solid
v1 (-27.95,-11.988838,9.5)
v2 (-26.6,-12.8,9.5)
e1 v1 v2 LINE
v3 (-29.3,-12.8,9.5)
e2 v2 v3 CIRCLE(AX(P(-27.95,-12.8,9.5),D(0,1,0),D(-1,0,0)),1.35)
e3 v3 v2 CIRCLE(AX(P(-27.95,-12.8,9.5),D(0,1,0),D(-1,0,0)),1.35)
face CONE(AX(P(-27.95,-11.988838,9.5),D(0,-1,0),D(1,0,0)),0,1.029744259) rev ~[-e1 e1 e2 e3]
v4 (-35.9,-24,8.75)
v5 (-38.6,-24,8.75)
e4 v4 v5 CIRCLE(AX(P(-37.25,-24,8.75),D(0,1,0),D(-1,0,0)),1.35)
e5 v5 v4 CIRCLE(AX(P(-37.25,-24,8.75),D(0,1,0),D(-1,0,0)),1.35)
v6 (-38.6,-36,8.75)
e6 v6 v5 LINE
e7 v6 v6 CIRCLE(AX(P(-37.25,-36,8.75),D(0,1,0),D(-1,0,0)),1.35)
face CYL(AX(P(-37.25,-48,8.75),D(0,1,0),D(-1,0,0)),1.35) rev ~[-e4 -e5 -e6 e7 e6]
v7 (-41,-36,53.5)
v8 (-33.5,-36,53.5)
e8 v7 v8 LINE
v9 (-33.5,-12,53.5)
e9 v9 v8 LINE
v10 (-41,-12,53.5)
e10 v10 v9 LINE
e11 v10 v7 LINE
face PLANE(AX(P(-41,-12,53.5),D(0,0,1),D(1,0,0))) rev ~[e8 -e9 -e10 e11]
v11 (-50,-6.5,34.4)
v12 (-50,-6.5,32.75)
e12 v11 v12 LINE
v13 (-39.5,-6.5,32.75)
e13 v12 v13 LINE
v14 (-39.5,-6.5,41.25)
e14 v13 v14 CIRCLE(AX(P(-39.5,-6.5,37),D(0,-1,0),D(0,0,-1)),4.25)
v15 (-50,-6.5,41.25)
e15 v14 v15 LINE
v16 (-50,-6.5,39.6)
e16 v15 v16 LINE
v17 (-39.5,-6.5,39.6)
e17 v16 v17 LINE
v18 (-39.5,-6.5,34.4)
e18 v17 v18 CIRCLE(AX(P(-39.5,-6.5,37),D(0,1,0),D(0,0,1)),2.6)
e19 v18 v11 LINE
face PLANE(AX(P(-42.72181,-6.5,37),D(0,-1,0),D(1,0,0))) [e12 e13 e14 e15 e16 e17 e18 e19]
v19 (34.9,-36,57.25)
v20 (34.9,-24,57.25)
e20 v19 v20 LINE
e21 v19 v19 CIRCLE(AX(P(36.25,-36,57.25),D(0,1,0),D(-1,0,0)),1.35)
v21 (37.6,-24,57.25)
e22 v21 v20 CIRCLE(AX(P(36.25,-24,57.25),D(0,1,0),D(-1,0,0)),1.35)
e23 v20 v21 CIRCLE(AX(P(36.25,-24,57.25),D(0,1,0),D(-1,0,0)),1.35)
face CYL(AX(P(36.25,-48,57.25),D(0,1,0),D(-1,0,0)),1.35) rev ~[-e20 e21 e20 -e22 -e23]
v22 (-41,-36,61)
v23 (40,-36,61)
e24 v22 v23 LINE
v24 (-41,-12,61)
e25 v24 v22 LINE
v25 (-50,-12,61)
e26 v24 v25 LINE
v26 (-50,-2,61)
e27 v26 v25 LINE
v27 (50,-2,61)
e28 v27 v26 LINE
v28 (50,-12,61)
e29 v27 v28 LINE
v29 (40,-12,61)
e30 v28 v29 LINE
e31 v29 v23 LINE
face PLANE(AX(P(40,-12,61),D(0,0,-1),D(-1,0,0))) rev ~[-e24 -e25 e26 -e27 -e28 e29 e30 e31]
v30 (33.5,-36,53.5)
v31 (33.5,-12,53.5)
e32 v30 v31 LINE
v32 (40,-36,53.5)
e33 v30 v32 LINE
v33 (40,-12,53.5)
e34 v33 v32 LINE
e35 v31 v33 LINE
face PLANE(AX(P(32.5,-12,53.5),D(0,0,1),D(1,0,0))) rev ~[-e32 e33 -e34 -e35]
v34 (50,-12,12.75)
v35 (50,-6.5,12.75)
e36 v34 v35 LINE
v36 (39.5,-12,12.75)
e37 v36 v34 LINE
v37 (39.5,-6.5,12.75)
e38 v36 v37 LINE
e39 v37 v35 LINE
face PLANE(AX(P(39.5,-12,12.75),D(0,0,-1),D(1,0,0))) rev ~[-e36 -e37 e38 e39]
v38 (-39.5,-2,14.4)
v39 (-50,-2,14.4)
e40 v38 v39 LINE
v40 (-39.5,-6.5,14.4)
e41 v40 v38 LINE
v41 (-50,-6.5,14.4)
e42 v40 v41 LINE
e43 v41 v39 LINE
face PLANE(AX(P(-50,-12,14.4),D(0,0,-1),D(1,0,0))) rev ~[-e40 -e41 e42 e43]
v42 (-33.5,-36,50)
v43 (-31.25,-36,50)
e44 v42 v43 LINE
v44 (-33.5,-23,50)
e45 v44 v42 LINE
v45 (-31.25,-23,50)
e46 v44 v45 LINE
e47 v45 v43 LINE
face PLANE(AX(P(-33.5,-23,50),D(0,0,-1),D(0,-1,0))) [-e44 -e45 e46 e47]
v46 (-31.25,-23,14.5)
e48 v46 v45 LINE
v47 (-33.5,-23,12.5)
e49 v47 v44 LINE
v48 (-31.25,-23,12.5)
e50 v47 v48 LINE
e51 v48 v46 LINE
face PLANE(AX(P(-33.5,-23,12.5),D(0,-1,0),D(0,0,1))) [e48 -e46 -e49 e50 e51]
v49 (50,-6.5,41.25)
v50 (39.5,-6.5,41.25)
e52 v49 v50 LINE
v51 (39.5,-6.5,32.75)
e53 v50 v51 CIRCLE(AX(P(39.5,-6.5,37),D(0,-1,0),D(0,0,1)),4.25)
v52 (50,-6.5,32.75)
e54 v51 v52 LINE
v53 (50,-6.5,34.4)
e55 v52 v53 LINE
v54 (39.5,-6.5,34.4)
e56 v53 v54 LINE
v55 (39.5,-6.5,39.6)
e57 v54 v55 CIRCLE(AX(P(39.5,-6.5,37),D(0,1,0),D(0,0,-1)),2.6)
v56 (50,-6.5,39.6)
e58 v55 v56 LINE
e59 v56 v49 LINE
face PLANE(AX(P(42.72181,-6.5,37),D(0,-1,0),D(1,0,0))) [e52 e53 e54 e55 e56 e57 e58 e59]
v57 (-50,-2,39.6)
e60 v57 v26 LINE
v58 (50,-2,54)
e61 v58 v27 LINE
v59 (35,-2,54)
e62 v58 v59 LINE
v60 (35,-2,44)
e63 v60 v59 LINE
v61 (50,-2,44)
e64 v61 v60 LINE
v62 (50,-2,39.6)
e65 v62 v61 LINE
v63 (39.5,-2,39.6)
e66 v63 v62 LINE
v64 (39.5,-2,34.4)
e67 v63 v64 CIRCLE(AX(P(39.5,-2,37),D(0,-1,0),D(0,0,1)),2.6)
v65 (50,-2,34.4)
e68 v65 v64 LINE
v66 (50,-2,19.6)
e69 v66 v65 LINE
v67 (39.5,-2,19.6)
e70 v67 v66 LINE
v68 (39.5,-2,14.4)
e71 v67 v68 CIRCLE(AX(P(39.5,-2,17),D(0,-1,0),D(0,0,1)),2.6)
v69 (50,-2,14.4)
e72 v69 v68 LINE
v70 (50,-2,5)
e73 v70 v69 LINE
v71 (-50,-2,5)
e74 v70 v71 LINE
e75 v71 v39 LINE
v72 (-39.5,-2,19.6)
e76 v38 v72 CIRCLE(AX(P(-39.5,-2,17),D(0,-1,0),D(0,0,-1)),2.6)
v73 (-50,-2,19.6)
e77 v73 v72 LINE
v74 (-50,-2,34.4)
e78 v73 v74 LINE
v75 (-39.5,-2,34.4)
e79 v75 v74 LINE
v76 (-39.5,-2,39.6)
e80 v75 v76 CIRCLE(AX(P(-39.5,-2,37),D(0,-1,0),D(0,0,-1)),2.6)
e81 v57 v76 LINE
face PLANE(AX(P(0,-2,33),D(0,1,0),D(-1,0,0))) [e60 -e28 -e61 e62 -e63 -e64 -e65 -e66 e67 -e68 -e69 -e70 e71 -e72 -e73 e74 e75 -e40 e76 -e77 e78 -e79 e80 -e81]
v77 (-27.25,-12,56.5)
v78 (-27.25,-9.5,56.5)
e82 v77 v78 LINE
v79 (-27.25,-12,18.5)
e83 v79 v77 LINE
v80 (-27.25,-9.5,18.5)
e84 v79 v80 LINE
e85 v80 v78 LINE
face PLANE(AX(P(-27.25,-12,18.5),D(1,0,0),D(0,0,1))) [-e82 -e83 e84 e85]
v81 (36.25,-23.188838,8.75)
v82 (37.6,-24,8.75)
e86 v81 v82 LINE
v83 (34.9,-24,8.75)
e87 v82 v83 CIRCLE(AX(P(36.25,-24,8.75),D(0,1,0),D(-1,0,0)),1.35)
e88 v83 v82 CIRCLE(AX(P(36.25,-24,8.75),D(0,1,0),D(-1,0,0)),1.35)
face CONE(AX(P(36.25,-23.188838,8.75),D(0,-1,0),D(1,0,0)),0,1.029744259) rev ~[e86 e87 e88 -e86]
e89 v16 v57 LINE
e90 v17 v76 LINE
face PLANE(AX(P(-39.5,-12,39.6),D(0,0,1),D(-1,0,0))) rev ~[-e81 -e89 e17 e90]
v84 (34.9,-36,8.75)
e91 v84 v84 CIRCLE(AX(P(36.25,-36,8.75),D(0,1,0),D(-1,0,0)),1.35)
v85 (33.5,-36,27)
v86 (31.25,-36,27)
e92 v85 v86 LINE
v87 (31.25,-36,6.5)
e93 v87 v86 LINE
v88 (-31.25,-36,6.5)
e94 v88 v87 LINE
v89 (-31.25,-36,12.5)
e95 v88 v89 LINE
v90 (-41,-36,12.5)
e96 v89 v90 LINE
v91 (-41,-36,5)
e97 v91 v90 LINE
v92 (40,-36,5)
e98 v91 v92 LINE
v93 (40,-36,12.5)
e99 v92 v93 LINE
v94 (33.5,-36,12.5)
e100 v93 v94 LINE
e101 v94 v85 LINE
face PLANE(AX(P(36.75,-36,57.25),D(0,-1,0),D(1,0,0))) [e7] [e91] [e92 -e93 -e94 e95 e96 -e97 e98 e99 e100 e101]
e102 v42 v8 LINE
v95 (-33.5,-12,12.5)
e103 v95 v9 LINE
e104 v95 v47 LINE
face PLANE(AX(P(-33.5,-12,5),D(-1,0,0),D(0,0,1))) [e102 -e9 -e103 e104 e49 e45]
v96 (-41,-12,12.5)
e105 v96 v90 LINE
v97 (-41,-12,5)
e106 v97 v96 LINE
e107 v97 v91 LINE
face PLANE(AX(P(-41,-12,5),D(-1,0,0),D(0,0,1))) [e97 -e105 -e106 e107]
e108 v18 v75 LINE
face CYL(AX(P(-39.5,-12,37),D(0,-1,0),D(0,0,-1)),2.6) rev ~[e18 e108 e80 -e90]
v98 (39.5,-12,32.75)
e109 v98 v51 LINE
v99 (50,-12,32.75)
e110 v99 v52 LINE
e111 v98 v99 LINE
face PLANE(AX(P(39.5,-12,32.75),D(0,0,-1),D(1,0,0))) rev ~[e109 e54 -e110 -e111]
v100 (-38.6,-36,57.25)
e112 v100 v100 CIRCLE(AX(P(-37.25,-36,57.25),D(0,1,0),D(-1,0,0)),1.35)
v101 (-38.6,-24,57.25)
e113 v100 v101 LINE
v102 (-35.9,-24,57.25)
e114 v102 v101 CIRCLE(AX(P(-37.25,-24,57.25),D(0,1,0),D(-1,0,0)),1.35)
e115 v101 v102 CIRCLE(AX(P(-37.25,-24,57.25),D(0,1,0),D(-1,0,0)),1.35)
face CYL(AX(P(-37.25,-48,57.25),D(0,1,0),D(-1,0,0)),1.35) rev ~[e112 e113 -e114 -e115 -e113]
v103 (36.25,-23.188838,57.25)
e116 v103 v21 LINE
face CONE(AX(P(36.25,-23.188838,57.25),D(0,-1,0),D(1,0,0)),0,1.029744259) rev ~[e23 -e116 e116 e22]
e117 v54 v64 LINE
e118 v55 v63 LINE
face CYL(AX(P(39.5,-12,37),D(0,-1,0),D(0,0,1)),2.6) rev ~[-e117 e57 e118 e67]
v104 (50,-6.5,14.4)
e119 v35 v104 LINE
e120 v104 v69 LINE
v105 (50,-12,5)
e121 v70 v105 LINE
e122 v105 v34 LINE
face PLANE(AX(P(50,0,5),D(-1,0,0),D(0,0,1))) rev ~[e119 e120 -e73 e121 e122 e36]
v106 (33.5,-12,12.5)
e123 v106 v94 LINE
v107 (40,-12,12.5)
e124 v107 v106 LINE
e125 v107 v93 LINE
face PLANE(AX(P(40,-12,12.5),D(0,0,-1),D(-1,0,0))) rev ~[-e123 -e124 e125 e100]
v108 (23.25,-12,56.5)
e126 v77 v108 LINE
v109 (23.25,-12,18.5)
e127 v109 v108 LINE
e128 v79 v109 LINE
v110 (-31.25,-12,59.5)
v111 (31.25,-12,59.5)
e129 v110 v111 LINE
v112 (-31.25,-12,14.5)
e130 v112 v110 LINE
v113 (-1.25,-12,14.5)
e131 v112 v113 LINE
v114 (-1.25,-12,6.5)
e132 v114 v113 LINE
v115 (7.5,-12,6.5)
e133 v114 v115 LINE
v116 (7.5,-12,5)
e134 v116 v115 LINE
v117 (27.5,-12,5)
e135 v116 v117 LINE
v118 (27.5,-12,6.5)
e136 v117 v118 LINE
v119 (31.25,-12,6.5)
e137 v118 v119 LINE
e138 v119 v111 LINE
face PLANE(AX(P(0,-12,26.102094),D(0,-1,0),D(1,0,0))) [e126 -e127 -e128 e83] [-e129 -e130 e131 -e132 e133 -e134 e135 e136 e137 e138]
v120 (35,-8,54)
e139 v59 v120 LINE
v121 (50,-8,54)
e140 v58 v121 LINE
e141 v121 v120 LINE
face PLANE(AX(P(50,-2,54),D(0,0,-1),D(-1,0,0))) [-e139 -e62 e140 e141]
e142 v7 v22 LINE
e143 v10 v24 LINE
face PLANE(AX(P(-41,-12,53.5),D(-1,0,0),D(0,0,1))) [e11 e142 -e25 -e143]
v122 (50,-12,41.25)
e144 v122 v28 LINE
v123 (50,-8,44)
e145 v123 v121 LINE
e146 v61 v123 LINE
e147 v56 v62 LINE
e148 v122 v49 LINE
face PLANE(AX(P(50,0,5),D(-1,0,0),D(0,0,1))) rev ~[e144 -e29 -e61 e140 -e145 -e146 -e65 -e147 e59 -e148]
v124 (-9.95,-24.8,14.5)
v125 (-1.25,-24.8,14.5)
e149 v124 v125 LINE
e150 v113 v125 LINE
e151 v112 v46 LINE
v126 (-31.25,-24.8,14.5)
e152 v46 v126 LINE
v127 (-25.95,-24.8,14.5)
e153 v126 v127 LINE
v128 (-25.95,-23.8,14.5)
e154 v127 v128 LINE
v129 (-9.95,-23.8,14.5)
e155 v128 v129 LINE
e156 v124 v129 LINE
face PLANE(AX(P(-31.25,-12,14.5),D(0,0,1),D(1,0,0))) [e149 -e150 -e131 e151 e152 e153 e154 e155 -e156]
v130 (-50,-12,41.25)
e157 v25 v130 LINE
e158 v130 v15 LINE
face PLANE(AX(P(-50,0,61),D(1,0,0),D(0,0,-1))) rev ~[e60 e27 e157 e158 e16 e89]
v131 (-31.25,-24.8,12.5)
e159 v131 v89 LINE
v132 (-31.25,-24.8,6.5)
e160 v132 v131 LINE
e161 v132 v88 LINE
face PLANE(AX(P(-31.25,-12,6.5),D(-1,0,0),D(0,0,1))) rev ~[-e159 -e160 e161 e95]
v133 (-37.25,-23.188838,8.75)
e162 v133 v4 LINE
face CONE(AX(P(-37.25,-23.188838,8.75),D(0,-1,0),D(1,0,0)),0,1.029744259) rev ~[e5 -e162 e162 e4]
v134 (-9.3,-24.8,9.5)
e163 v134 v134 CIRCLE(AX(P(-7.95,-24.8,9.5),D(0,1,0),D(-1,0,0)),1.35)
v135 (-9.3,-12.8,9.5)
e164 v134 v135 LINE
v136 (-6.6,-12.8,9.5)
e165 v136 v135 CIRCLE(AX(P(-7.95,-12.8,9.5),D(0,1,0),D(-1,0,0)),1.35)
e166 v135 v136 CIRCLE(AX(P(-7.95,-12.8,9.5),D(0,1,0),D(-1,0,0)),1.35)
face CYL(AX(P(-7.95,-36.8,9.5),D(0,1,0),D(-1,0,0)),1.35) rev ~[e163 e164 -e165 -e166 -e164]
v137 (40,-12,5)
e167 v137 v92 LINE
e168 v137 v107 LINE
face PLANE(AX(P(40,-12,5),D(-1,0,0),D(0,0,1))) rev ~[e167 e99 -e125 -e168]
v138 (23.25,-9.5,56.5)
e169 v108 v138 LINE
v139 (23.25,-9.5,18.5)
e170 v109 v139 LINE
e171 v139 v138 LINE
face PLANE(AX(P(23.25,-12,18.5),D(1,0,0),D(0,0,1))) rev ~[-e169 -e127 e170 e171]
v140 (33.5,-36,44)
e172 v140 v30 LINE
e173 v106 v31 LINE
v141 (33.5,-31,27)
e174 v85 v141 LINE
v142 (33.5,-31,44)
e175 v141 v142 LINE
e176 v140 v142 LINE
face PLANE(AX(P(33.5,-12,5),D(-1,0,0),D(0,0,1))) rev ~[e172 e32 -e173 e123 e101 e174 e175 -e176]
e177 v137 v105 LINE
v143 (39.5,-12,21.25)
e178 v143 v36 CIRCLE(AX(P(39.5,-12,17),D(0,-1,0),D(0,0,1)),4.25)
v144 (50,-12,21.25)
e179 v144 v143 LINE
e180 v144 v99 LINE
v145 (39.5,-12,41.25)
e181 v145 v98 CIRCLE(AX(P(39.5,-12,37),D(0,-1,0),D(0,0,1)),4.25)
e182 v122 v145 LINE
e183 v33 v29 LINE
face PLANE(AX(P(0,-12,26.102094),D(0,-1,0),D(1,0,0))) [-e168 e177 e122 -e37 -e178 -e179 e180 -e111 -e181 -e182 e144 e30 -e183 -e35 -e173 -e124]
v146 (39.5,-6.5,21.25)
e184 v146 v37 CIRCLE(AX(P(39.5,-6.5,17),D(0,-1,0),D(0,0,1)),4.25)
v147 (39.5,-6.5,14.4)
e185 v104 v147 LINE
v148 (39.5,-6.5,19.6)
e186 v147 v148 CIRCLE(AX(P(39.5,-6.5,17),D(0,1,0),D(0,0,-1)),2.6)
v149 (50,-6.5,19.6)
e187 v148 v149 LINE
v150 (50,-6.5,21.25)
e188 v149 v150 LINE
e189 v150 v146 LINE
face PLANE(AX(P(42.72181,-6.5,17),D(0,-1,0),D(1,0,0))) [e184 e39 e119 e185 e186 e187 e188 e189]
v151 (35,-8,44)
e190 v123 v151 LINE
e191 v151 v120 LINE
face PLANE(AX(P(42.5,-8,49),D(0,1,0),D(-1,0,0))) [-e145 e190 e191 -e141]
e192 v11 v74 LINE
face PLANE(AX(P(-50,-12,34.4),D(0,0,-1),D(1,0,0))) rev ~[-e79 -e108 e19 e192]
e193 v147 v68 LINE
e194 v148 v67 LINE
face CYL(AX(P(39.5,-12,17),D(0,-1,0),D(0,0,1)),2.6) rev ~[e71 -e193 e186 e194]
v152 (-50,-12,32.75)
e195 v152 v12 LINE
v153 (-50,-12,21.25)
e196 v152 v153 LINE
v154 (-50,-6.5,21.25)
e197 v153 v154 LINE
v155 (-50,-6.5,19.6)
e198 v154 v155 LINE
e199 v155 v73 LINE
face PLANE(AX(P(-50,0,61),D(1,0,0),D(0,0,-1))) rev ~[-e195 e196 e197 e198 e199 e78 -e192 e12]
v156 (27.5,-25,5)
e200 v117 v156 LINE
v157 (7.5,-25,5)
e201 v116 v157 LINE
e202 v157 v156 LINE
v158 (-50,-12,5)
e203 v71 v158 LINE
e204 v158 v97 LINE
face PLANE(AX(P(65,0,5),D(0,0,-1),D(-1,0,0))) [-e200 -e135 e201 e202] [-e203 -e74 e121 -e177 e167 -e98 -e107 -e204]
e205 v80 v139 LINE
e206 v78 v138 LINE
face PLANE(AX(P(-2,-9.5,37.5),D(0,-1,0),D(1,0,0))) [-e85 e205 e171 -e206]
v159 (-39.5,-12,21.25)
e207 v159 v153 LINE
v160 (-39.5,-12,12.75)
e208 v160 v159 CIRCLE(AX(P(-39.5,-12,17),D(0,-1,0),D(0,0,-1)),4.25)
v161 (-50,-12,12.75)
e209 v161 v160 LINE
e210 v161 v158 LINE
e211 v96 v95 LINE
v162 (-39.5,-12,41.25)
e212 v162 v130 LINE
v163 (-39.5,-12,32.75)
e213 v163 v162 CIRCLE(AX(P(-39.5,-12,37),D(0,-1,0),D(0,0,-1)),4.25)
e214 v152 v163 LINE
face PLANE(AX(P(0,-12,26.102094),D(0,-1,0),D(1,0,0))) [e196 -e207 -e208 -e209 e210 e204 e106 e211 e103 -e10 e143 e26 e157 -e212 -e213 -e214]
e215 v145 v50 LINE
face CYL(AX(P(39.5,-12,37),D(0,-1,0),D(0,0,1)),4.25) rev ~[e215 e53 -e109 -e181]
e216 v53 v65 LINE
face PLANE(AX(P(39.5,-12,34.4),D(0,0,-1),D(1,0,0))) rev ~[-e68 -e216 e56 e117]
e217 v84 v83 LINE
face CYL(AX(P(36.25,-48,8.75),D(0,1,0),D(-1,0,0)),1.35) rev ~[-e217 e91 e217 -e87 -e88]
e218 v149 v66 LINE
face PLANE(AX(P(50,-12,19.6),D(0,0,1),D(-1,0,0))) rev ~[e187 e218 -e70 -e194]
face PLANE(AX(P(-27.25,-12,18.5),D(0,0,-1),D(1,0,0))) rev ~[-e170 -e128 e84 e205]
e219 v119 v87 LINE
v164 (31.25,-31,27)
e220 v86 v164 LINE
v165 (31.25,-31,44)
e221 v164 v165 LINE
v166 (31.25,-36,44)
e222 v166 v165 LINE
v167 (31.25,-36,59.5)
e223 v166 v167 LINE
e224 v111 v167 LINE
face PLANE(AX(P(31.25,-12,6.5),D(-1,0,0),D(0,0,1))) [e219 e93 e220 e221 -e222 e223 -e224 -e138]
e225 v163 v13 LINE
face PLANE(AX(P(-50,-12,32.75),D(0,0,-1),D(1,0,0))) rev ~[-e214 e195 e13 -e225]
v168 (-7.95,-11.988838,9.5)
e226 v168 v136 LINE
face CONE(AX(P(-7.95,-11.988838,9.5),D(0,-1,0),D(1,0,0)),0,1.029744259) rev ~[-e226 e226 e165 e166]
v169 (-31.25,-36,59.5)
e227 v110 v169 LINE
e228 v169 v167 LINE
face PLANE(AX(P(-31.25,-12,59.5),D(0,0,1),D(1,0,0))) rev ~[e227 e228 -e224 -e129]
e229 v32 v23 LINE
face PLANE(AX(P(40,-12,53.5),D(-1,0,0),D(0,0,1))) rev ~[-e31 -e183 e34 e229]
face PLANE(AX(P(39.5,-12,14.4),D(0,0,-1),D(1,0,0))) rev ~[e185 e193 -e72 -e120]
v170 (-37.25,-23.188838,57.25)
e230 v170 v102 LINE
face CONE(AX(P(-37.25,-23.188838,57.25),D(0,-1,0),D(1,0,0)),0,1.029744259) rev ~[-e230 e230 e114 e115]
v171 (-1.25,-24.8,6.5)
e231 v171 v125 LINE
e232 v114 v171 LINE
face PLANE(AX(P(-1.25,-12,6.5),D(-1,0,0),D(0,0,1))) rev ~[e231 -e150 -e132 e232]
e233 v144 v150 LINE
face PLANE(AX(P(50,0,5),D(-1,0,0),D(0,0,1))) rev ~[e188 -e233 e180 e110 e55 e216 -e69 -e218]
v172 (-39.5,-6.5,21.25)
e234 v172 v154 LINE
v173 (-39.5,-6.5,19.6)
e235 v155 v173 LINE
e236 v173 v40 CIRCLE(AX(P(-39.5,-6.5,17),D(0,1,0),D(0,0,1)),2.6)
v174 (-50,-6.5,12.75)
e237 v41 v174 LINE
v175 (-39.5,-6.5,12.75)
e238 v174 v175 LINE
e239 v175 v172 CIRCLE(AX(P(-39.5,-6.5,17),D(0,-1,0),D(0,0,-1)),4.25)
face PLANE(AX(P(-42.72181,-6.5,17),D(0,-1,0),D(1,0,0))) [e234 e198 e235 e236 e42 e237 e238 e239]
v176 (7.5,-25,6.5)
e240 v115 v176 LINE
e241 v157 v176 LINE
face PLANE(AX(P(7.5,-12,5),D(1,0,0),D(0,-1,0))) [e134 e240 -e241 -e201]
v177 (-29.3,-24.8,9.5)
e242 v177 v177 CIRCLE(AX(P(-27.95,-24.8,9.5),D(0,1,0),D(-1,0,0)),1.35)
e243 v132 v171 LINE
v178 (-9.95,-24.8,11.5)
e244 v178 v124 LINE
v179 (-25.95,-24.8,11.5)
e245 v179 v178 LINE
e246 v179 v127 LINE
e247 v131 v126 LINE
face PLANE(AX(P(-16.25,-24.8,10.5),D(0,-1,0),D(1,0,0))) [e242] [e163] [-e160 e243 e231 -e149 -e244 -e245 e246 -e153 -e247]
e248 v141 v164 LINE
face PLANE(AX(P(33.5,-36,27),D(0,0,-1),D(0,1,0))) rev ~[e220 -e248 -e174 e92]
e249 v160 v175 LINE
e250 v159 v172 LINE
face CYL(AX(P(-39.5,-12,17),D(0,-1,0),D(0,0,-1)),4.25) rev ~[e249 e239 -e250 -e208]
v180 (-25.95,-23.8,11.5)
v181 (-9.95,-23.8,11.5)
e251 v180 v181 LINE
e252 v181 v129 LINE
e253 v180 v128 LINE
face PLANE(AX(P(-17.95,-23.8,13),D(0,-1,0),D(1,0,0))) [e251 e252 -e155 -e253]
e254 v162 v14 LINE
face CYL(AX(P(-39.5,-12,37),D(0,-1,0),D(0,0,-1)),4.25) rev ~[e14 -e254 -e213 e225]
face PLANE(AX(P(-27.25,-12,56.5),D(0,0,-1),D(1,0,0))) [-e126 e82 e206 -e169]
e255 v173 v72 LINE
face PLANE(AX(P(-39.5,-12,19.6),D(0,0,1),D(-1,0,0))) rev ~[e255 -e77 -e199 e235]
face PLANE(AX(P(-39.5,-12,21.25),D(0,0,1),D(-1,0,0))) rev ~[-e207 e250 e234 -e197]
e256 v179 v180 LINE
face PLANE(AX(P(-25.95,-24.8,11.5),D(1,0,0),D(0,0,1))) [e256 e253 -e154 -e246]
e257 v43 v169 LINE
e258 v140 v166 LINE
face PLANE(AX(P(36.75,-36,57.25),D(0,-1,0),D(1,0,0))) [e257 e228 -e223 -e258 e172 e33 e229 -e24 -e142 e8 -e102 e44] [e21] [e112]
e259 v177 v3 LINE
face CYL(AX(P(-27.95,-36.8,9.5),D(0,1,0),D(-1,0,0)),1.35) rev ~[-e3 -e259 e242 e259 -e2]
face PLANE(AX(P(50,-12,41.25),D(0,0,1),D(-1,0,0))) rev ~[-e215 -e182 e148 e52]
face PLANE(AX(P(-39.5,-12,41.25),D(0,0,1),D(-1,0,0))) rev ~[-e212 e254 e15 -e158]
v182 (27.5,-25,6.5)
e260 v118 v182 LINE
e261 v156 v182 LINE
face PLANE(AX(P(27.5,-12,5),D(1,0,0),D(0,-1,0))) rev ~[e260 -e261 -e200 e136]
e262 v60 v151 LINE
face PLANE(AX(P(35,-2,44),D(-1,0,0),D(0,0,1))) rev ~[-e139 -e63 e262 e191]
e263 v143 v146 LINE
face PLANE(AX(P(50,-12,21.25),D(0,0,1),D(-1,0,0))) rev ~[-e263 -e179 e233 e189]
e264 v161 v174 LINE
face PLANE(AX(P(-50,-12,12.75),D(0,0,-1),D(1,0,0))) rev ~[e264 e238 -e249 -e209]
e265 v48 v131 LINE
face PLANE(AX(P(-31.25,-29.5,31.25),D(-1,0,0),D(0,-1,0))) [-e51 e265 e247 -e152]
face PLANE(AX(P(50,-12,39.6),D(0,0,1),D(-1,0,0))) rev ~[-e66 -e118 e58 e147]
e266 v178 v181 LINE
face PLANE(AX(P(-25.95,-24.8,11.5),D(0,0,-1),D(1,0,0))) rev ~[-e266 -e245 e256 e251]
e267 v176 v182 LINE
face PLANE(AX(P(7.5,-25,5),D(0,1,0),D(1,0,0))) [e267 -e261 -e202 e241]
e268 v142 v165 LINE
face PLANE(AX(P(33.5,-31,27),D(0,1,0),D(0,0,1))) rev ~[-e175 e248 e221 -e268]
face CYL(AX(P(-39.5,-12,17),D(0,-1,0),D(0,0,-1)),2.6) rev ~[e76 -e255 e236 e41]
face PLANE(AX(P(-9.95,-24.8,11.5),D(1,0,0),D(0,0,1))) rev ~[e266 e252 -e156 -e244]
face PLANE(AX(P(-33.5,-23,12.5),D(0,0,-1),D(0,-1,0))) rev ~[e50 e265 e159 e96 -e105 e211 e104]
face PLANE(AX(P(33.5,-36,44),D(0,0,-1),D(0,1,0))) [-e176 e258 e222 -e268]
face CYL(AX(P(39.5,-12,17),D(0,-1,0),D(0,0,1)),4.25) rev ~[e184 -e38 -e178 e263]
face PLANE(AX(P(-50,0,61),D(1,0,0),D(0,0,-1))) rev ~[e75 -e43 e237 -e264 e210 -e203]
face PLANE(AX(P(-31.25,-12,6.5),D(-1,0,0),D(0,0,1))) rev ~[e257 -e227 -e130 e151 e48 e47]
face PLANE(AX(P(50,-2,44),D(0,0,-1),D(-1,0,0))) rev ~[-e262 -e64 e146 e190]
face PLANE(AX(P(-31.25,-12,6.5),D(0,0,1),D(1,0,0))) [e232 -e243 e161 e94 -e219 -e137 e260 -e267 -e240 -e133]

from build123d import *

# Parameters (mm, degrees)
F1_DEPTH  = 12
F3_DEPTH  = 5
F4_W      = 100
F4_H      = 56
F5_DEPTH  = 2
F6_W      = 130
F6_H      = 5
F7_DEPTH  = 12.001
F9_DEPTH  = 10.001
F11_DEPTH = 5.5
F12_W     = 67
F12_H     = 56
F12_W_2   = 62.5
F12_H_2   = 53
F13_DEPTH = 24
F14_W     = 30
F14_H     = 8
F15_DEPTH = 12.8
F16_W     = 13
F16_H     = 37.5
F17_DEPTH = 2.25
F18_W     = 20
F18_H     = 13
F19_DEPTH = 1.5
F21_D     = 2.7
F21_DEPTH = 12
F21_TIP   = 0.8111618357
F22_W     = 50.5
F22_H     = 38
F23_DEPTH = 2.5
F24_W     = 6.5
F24_H     = 7.5
F24_W_2   = 1
F24_W_3   = 7.5
F25_DEPTH = 24
F27_D     = 2.7
F27_DEPTH = 12
F27_TIP   = 0.8111618357
F28_W     = 5
F28_H     = 17
F29_DEPTH = 2.25
F30_W     = 15
F30_H     = 10
F31_DEPTH = 6
F32_W     = 16
F32_H     = 3
F33_DEPTH = 1


# Not quite as in the source:
# - a feature names something its author has since deleted; it is built from what else it names


with BuildPart() as f1:
    # F0 (on Front) → F1 (new body)
    with BuildSketch(Plane.XZ):
        Polygon((-65, 5), (-65, 0), (65, 0), (65, 5), (50, 5), (50, 61), (-50, 61), (-50, 5), align=None)
    extrude(amount=F1_DEPTH)

    # F2 (on face) → F3 (cut, through all)
    with BuildSketch(Plane(origin=(0, 0, 0), x_dir=(1, 0, 0), z_dir=(0, 0, -1))):
        with BuildLine():
            Line((-65, 2.65), (-63, 2.65))
            ThreePointArc((-63, 2.65), (-59.65, 6), (-63, 9.35))
            Line((-63, 9.35), (-65, 9.35))
            Line((-65, 9.35), (-65, 2.65))
        make_face()
        with BuildLine():
            Line((65, 9.35), (63, 9.35))
            ThreePointArc((63, 9.35), (59.65, 6), (63, 2.65))
            Line((63, 2.65), (65, 2.65))
            Line((65, 2.65), (65, 9.35))
        make_face()
    extrude(amount=-F3_DEPTH, mode=Mode.SUBTRACT)

    # F4 (on face) → F5 (cut)
    with BuildSketch(Plane(origin=(0, 0, 0), x_dir=(-1, 0, 0), z_dir=(0, 1, 0))):
        with Locations((0, 33)):
            Rectangle(F4_W, F4_H)
    extrude(amount=-F5_DEPTH, mode=Mode.SUBTRACT)

    # F6 (on face) → F7 (cut, through all)
    with BuildSketch(Plane(origin=(0, 0, 0), x_dir=(-1, 0, 0), z_dir=(0, 1, 0))):
        with Locations((0, 2.5)):
            Rectangle(F6_W, F6_H)
    extrude(amount=-F7_DEPTH, mode=Mode.SUBTRACT)

    # F8 (on face) → F9 (cut, through all)
    with BuildSketch(Plane.XZ.offset(12)):
        with BuildLine():
            ThreePointArc((-39.5, 34.4), (-36.9, 37), (-39.5, 39.6))
            Line((-39.5, 39.6), (-50, 39.6))
            Line((-50, 39.6), (-50, 34.4))
            Line((-50, 34.4), (-39.5, 34.4))
        make_face()
        with BuildLine():
            Line((-39.5, 19.6), (-50, 19.6))
            Line((-50, 19.6), (-50, 14.4))
            Line((-50, 14.4), (-39.5, 14.4))
            ThreePointArc((-39.5, 14.4), (-36.9, 17), (-39.5, 19.6))
        make_face()
        with BuildLine():
            Line((50, 39.6), (39.5, 39.6))
            ThreePointArc((39.5, 39.6), (36.9, 37), (39.5, 34.4))
            Line((39.5, 34.4), (50, 34.4))
            Line((50, 34.4), (50, 39.6))
        make_face()
        with BuildLine():
            Line((50, 14.4), (50, 19.6))
            Line((50, 19.6), (39.5, 19.6))
            ThreePointArc((39.5, 19.6), (36.9, 17), (39.5, 14.4))
            Line((39.5, 14.4), (50, 14.4))
        make_face()
    extrude(amount=-F9_DEPTH, mode=Mode.SUBTRACT)

    # F10 (on face) → F11 (cut)
    with BuildSketch(Plane.XZ.offset(12)):
        with BuildLine():
            Line((-50, 32.75), (-39.5, 32.75))
            ThreePointArc((-39.5, 32.75), (-35.25, 37), (-39.5, 41.25))
            Line((-39.5, 41.25), (-50, 41.25))
            Line((-50, 41.25), (-50, 39.6))
            Line((-50, 39.6), (-39.5, 39.6))
            ThreePointArc((-39.5, 39.6), (-36.9, 37), (-39.5, 34.4))
            Line((-39.5, 34.4), (-50, 34.4))
            Line((-50, 34.4), (-50, 32.75))
        make_face()
        with BuildLine():
            Line((-39.5, 21.25), (-50, 21.25))
            Line((-50, 21.25), (-50, 19.6))
            Line((-50, 19.6), (-39.5, 19.6))
            ThreePointArc((-39.5, 19.6), (-36.9, 17), (-39.5, 14.4))
            Line((-39.5, 14.4), (-50, 14.4))
            Line((-50, 14.4), (-50, 12.75))
            Line((-50, 12.75), (-39.5, 12.75))
            ThreePointArc((-39.5, 12.75), (-35.25, 17), (-39.5, 21.25))
        make_face()
        with BuildLine():
            Line((50, 39.6), (50, 41.25))
            Line((50, 41.25), (39.5, 41.25))
            ThreePointArc((39.5, 41.25), (35.25, 37), (39.5, 32.75))
            Line((39.5, 32.75), (50, 32.75))
            Line((50, 32.75), (50, 34.4))
            Line((50, 34.4), (39.5, 34.4))
            ThreePointArc((39.5, 34.4), (36.9, 37), (39.5, 39.6))
            Line((39.5, 39.6), (50, 39.6))
        make_face()
        with BuildLine():
            Line((39.5, 12.75), (50, 12.75))
            Line((50, 12.75), (50, 14.4))
            Line((50, 14.4), (39.5, 14.4))
            ThreePointArc((39.5, 14.4), (36.9, 17), (39.5, 19.6))
            Line((39.5, 19.6), (50, 19.6))
            Line((50, 19.6), (50, 21.25))
            Line((50, 21.25), (39.5, 21.25))
            ThreePointArc((39.5, 21.25), (35.25, 17), (39.5, 12.75))
        make_face()
    extrude(amount=-F11_DEPTH, mode=Mode.SUBTRACT)

    # F12 (on face) → F13 (join)
    with BuildSketch(Plane.XZ.offset(12)):
        with Locations((0, 33)):
            Rectangle(F12_W, F12_H)
        with Locations((0, 33)):
            Rectangle(F12_W_2, F12_H_2, mode=Mode.SUBTRACT)
    extrude(amount=F13_DEPTH)

    # F14 (on face) → F15 (join)
    with BuildSketch(Plane.XZ.offset(12)):
        with Locations((-16.25, 10.5)):
            Rectangle(F14_W, F14_H)
    extrude(amount=F15_DEPTH)

    # F16 (on face) → F17 (cut, through all)
    with BuildSketch(Plane(origin=(-33.5, 0, 0), x_dir=(0, -1, 0), z_dir=(-1, 0, 0))):
        with Locations((29.5, 31.25)):
            Rectangle(F16_W, F16_H)
    extrude(amount=-F17_DEPTH, mode=Mode.SUBTRACT)

    # F18 (on face) → F19 (cut, through all)
    with BuildSketch(Plane(origin=(0, 0, 5), x_dir=(1, 0, 0), z_dir=(0, 0, -1))):
        with Locations((17.5, 18.5)):
            Rectangle(F18_W, F18_H)
    extrude(amount=-F19_DEPTH, mode=Mode.SUBTRACT)

    # F21
    with Locations(Plane.XZ.offset(24.8)):
        with Locations((-27.95, 9.5), (-7.95, 9.5)):
            Hole(F21_D / 2, depth=F21_DEPTH)
            with Locations((0, 0, -(F21_DEPTH + F21_TIP / 2))):  # 118° drill point
                Cone(0, F21_D / 2, F21_TIP, mode=Mode.SUBTRACT)

    # F22 (on face) → F23 (cut)
    with BuildSketch(Plane.XZ.offset(12)):
        with Locations((-2, 37.5)):
            Rectangle(F22_W, F22_H)
    extrude(amount=-F23_DEPTH, mode=Mode.SUBTRACT)

    # F24 (on face) → F25 (join, through all)
    with BuildSketch(Plane.XZ.offset(12)):
        with Locations((36.75, 57.25)):
            Rectangle(F24_W, F24_H)
        with Locations((33, 57.25)):
            Rectangle(F24_W_2, F24_H)
        with Locations((36.75, 8.75)):
            Rectangle(F24_W, F24_H)
        with Locations((33, 8.75)):
            Rectangle(F24_W_2, F24_H)
        with Locations((-37.25, 8.75)):
            Rectangle(F24_W_3, F24_H)
        with Locations((-37.25, 57.25)):
            Rectangle(F24_W_3, F24_H)
    extrude(amount=F25_DEPTH)

    # F27
    with Locations(Plane.XZ.offset(36)):
        with Locations((36.25, 57.25), (36.25, 8.75), (-37.25, 8.75), (-37.25, 57.25)):
            Hole(F27_D / 2, depth=F27_DEPTH)
            with Locations((0, 0, -(F27_DEPTH + F27_TIP / 2))):  # 118° drill point
                Cone(0, F27_D / 2, F27_TIP, mode=Mode.SUBTRACT)

    # F28 (on face) → F29 (cut, through all)
    with BuildSketch(Plane.YZ.offset(33.5)):
        with Locations((-33.5, 35.5)):
            Rectangle(F28_W, F28_H)
    extrude(amount=-F29_DEPTH, mode=Mode.SUBTRACT)

    # F30 (on face) → F31 (cut)
    with BuildSketch(Plane(origin=(0, -2, 0), x_dir=(-1, 0, 0), z_dir=(0, 1, 0))):
        with Locations((-42.5, 49)):
            Rectangle(F30_W, F30_H)
    extrude(amount=-F31_DEPTH, mode=Mode.SUBTRACT)

    # F32 (on face) → F33 (cut)
    with BuildSketch(Plane.XZ.offset(24.8)):
        with Locations((-17.95, 13)):
            Rectangle(F32_W, F32_H)
    extrude(amount=-F33_DEPTH, mode=Mode.SUBTRACT)


solid = f1.part
